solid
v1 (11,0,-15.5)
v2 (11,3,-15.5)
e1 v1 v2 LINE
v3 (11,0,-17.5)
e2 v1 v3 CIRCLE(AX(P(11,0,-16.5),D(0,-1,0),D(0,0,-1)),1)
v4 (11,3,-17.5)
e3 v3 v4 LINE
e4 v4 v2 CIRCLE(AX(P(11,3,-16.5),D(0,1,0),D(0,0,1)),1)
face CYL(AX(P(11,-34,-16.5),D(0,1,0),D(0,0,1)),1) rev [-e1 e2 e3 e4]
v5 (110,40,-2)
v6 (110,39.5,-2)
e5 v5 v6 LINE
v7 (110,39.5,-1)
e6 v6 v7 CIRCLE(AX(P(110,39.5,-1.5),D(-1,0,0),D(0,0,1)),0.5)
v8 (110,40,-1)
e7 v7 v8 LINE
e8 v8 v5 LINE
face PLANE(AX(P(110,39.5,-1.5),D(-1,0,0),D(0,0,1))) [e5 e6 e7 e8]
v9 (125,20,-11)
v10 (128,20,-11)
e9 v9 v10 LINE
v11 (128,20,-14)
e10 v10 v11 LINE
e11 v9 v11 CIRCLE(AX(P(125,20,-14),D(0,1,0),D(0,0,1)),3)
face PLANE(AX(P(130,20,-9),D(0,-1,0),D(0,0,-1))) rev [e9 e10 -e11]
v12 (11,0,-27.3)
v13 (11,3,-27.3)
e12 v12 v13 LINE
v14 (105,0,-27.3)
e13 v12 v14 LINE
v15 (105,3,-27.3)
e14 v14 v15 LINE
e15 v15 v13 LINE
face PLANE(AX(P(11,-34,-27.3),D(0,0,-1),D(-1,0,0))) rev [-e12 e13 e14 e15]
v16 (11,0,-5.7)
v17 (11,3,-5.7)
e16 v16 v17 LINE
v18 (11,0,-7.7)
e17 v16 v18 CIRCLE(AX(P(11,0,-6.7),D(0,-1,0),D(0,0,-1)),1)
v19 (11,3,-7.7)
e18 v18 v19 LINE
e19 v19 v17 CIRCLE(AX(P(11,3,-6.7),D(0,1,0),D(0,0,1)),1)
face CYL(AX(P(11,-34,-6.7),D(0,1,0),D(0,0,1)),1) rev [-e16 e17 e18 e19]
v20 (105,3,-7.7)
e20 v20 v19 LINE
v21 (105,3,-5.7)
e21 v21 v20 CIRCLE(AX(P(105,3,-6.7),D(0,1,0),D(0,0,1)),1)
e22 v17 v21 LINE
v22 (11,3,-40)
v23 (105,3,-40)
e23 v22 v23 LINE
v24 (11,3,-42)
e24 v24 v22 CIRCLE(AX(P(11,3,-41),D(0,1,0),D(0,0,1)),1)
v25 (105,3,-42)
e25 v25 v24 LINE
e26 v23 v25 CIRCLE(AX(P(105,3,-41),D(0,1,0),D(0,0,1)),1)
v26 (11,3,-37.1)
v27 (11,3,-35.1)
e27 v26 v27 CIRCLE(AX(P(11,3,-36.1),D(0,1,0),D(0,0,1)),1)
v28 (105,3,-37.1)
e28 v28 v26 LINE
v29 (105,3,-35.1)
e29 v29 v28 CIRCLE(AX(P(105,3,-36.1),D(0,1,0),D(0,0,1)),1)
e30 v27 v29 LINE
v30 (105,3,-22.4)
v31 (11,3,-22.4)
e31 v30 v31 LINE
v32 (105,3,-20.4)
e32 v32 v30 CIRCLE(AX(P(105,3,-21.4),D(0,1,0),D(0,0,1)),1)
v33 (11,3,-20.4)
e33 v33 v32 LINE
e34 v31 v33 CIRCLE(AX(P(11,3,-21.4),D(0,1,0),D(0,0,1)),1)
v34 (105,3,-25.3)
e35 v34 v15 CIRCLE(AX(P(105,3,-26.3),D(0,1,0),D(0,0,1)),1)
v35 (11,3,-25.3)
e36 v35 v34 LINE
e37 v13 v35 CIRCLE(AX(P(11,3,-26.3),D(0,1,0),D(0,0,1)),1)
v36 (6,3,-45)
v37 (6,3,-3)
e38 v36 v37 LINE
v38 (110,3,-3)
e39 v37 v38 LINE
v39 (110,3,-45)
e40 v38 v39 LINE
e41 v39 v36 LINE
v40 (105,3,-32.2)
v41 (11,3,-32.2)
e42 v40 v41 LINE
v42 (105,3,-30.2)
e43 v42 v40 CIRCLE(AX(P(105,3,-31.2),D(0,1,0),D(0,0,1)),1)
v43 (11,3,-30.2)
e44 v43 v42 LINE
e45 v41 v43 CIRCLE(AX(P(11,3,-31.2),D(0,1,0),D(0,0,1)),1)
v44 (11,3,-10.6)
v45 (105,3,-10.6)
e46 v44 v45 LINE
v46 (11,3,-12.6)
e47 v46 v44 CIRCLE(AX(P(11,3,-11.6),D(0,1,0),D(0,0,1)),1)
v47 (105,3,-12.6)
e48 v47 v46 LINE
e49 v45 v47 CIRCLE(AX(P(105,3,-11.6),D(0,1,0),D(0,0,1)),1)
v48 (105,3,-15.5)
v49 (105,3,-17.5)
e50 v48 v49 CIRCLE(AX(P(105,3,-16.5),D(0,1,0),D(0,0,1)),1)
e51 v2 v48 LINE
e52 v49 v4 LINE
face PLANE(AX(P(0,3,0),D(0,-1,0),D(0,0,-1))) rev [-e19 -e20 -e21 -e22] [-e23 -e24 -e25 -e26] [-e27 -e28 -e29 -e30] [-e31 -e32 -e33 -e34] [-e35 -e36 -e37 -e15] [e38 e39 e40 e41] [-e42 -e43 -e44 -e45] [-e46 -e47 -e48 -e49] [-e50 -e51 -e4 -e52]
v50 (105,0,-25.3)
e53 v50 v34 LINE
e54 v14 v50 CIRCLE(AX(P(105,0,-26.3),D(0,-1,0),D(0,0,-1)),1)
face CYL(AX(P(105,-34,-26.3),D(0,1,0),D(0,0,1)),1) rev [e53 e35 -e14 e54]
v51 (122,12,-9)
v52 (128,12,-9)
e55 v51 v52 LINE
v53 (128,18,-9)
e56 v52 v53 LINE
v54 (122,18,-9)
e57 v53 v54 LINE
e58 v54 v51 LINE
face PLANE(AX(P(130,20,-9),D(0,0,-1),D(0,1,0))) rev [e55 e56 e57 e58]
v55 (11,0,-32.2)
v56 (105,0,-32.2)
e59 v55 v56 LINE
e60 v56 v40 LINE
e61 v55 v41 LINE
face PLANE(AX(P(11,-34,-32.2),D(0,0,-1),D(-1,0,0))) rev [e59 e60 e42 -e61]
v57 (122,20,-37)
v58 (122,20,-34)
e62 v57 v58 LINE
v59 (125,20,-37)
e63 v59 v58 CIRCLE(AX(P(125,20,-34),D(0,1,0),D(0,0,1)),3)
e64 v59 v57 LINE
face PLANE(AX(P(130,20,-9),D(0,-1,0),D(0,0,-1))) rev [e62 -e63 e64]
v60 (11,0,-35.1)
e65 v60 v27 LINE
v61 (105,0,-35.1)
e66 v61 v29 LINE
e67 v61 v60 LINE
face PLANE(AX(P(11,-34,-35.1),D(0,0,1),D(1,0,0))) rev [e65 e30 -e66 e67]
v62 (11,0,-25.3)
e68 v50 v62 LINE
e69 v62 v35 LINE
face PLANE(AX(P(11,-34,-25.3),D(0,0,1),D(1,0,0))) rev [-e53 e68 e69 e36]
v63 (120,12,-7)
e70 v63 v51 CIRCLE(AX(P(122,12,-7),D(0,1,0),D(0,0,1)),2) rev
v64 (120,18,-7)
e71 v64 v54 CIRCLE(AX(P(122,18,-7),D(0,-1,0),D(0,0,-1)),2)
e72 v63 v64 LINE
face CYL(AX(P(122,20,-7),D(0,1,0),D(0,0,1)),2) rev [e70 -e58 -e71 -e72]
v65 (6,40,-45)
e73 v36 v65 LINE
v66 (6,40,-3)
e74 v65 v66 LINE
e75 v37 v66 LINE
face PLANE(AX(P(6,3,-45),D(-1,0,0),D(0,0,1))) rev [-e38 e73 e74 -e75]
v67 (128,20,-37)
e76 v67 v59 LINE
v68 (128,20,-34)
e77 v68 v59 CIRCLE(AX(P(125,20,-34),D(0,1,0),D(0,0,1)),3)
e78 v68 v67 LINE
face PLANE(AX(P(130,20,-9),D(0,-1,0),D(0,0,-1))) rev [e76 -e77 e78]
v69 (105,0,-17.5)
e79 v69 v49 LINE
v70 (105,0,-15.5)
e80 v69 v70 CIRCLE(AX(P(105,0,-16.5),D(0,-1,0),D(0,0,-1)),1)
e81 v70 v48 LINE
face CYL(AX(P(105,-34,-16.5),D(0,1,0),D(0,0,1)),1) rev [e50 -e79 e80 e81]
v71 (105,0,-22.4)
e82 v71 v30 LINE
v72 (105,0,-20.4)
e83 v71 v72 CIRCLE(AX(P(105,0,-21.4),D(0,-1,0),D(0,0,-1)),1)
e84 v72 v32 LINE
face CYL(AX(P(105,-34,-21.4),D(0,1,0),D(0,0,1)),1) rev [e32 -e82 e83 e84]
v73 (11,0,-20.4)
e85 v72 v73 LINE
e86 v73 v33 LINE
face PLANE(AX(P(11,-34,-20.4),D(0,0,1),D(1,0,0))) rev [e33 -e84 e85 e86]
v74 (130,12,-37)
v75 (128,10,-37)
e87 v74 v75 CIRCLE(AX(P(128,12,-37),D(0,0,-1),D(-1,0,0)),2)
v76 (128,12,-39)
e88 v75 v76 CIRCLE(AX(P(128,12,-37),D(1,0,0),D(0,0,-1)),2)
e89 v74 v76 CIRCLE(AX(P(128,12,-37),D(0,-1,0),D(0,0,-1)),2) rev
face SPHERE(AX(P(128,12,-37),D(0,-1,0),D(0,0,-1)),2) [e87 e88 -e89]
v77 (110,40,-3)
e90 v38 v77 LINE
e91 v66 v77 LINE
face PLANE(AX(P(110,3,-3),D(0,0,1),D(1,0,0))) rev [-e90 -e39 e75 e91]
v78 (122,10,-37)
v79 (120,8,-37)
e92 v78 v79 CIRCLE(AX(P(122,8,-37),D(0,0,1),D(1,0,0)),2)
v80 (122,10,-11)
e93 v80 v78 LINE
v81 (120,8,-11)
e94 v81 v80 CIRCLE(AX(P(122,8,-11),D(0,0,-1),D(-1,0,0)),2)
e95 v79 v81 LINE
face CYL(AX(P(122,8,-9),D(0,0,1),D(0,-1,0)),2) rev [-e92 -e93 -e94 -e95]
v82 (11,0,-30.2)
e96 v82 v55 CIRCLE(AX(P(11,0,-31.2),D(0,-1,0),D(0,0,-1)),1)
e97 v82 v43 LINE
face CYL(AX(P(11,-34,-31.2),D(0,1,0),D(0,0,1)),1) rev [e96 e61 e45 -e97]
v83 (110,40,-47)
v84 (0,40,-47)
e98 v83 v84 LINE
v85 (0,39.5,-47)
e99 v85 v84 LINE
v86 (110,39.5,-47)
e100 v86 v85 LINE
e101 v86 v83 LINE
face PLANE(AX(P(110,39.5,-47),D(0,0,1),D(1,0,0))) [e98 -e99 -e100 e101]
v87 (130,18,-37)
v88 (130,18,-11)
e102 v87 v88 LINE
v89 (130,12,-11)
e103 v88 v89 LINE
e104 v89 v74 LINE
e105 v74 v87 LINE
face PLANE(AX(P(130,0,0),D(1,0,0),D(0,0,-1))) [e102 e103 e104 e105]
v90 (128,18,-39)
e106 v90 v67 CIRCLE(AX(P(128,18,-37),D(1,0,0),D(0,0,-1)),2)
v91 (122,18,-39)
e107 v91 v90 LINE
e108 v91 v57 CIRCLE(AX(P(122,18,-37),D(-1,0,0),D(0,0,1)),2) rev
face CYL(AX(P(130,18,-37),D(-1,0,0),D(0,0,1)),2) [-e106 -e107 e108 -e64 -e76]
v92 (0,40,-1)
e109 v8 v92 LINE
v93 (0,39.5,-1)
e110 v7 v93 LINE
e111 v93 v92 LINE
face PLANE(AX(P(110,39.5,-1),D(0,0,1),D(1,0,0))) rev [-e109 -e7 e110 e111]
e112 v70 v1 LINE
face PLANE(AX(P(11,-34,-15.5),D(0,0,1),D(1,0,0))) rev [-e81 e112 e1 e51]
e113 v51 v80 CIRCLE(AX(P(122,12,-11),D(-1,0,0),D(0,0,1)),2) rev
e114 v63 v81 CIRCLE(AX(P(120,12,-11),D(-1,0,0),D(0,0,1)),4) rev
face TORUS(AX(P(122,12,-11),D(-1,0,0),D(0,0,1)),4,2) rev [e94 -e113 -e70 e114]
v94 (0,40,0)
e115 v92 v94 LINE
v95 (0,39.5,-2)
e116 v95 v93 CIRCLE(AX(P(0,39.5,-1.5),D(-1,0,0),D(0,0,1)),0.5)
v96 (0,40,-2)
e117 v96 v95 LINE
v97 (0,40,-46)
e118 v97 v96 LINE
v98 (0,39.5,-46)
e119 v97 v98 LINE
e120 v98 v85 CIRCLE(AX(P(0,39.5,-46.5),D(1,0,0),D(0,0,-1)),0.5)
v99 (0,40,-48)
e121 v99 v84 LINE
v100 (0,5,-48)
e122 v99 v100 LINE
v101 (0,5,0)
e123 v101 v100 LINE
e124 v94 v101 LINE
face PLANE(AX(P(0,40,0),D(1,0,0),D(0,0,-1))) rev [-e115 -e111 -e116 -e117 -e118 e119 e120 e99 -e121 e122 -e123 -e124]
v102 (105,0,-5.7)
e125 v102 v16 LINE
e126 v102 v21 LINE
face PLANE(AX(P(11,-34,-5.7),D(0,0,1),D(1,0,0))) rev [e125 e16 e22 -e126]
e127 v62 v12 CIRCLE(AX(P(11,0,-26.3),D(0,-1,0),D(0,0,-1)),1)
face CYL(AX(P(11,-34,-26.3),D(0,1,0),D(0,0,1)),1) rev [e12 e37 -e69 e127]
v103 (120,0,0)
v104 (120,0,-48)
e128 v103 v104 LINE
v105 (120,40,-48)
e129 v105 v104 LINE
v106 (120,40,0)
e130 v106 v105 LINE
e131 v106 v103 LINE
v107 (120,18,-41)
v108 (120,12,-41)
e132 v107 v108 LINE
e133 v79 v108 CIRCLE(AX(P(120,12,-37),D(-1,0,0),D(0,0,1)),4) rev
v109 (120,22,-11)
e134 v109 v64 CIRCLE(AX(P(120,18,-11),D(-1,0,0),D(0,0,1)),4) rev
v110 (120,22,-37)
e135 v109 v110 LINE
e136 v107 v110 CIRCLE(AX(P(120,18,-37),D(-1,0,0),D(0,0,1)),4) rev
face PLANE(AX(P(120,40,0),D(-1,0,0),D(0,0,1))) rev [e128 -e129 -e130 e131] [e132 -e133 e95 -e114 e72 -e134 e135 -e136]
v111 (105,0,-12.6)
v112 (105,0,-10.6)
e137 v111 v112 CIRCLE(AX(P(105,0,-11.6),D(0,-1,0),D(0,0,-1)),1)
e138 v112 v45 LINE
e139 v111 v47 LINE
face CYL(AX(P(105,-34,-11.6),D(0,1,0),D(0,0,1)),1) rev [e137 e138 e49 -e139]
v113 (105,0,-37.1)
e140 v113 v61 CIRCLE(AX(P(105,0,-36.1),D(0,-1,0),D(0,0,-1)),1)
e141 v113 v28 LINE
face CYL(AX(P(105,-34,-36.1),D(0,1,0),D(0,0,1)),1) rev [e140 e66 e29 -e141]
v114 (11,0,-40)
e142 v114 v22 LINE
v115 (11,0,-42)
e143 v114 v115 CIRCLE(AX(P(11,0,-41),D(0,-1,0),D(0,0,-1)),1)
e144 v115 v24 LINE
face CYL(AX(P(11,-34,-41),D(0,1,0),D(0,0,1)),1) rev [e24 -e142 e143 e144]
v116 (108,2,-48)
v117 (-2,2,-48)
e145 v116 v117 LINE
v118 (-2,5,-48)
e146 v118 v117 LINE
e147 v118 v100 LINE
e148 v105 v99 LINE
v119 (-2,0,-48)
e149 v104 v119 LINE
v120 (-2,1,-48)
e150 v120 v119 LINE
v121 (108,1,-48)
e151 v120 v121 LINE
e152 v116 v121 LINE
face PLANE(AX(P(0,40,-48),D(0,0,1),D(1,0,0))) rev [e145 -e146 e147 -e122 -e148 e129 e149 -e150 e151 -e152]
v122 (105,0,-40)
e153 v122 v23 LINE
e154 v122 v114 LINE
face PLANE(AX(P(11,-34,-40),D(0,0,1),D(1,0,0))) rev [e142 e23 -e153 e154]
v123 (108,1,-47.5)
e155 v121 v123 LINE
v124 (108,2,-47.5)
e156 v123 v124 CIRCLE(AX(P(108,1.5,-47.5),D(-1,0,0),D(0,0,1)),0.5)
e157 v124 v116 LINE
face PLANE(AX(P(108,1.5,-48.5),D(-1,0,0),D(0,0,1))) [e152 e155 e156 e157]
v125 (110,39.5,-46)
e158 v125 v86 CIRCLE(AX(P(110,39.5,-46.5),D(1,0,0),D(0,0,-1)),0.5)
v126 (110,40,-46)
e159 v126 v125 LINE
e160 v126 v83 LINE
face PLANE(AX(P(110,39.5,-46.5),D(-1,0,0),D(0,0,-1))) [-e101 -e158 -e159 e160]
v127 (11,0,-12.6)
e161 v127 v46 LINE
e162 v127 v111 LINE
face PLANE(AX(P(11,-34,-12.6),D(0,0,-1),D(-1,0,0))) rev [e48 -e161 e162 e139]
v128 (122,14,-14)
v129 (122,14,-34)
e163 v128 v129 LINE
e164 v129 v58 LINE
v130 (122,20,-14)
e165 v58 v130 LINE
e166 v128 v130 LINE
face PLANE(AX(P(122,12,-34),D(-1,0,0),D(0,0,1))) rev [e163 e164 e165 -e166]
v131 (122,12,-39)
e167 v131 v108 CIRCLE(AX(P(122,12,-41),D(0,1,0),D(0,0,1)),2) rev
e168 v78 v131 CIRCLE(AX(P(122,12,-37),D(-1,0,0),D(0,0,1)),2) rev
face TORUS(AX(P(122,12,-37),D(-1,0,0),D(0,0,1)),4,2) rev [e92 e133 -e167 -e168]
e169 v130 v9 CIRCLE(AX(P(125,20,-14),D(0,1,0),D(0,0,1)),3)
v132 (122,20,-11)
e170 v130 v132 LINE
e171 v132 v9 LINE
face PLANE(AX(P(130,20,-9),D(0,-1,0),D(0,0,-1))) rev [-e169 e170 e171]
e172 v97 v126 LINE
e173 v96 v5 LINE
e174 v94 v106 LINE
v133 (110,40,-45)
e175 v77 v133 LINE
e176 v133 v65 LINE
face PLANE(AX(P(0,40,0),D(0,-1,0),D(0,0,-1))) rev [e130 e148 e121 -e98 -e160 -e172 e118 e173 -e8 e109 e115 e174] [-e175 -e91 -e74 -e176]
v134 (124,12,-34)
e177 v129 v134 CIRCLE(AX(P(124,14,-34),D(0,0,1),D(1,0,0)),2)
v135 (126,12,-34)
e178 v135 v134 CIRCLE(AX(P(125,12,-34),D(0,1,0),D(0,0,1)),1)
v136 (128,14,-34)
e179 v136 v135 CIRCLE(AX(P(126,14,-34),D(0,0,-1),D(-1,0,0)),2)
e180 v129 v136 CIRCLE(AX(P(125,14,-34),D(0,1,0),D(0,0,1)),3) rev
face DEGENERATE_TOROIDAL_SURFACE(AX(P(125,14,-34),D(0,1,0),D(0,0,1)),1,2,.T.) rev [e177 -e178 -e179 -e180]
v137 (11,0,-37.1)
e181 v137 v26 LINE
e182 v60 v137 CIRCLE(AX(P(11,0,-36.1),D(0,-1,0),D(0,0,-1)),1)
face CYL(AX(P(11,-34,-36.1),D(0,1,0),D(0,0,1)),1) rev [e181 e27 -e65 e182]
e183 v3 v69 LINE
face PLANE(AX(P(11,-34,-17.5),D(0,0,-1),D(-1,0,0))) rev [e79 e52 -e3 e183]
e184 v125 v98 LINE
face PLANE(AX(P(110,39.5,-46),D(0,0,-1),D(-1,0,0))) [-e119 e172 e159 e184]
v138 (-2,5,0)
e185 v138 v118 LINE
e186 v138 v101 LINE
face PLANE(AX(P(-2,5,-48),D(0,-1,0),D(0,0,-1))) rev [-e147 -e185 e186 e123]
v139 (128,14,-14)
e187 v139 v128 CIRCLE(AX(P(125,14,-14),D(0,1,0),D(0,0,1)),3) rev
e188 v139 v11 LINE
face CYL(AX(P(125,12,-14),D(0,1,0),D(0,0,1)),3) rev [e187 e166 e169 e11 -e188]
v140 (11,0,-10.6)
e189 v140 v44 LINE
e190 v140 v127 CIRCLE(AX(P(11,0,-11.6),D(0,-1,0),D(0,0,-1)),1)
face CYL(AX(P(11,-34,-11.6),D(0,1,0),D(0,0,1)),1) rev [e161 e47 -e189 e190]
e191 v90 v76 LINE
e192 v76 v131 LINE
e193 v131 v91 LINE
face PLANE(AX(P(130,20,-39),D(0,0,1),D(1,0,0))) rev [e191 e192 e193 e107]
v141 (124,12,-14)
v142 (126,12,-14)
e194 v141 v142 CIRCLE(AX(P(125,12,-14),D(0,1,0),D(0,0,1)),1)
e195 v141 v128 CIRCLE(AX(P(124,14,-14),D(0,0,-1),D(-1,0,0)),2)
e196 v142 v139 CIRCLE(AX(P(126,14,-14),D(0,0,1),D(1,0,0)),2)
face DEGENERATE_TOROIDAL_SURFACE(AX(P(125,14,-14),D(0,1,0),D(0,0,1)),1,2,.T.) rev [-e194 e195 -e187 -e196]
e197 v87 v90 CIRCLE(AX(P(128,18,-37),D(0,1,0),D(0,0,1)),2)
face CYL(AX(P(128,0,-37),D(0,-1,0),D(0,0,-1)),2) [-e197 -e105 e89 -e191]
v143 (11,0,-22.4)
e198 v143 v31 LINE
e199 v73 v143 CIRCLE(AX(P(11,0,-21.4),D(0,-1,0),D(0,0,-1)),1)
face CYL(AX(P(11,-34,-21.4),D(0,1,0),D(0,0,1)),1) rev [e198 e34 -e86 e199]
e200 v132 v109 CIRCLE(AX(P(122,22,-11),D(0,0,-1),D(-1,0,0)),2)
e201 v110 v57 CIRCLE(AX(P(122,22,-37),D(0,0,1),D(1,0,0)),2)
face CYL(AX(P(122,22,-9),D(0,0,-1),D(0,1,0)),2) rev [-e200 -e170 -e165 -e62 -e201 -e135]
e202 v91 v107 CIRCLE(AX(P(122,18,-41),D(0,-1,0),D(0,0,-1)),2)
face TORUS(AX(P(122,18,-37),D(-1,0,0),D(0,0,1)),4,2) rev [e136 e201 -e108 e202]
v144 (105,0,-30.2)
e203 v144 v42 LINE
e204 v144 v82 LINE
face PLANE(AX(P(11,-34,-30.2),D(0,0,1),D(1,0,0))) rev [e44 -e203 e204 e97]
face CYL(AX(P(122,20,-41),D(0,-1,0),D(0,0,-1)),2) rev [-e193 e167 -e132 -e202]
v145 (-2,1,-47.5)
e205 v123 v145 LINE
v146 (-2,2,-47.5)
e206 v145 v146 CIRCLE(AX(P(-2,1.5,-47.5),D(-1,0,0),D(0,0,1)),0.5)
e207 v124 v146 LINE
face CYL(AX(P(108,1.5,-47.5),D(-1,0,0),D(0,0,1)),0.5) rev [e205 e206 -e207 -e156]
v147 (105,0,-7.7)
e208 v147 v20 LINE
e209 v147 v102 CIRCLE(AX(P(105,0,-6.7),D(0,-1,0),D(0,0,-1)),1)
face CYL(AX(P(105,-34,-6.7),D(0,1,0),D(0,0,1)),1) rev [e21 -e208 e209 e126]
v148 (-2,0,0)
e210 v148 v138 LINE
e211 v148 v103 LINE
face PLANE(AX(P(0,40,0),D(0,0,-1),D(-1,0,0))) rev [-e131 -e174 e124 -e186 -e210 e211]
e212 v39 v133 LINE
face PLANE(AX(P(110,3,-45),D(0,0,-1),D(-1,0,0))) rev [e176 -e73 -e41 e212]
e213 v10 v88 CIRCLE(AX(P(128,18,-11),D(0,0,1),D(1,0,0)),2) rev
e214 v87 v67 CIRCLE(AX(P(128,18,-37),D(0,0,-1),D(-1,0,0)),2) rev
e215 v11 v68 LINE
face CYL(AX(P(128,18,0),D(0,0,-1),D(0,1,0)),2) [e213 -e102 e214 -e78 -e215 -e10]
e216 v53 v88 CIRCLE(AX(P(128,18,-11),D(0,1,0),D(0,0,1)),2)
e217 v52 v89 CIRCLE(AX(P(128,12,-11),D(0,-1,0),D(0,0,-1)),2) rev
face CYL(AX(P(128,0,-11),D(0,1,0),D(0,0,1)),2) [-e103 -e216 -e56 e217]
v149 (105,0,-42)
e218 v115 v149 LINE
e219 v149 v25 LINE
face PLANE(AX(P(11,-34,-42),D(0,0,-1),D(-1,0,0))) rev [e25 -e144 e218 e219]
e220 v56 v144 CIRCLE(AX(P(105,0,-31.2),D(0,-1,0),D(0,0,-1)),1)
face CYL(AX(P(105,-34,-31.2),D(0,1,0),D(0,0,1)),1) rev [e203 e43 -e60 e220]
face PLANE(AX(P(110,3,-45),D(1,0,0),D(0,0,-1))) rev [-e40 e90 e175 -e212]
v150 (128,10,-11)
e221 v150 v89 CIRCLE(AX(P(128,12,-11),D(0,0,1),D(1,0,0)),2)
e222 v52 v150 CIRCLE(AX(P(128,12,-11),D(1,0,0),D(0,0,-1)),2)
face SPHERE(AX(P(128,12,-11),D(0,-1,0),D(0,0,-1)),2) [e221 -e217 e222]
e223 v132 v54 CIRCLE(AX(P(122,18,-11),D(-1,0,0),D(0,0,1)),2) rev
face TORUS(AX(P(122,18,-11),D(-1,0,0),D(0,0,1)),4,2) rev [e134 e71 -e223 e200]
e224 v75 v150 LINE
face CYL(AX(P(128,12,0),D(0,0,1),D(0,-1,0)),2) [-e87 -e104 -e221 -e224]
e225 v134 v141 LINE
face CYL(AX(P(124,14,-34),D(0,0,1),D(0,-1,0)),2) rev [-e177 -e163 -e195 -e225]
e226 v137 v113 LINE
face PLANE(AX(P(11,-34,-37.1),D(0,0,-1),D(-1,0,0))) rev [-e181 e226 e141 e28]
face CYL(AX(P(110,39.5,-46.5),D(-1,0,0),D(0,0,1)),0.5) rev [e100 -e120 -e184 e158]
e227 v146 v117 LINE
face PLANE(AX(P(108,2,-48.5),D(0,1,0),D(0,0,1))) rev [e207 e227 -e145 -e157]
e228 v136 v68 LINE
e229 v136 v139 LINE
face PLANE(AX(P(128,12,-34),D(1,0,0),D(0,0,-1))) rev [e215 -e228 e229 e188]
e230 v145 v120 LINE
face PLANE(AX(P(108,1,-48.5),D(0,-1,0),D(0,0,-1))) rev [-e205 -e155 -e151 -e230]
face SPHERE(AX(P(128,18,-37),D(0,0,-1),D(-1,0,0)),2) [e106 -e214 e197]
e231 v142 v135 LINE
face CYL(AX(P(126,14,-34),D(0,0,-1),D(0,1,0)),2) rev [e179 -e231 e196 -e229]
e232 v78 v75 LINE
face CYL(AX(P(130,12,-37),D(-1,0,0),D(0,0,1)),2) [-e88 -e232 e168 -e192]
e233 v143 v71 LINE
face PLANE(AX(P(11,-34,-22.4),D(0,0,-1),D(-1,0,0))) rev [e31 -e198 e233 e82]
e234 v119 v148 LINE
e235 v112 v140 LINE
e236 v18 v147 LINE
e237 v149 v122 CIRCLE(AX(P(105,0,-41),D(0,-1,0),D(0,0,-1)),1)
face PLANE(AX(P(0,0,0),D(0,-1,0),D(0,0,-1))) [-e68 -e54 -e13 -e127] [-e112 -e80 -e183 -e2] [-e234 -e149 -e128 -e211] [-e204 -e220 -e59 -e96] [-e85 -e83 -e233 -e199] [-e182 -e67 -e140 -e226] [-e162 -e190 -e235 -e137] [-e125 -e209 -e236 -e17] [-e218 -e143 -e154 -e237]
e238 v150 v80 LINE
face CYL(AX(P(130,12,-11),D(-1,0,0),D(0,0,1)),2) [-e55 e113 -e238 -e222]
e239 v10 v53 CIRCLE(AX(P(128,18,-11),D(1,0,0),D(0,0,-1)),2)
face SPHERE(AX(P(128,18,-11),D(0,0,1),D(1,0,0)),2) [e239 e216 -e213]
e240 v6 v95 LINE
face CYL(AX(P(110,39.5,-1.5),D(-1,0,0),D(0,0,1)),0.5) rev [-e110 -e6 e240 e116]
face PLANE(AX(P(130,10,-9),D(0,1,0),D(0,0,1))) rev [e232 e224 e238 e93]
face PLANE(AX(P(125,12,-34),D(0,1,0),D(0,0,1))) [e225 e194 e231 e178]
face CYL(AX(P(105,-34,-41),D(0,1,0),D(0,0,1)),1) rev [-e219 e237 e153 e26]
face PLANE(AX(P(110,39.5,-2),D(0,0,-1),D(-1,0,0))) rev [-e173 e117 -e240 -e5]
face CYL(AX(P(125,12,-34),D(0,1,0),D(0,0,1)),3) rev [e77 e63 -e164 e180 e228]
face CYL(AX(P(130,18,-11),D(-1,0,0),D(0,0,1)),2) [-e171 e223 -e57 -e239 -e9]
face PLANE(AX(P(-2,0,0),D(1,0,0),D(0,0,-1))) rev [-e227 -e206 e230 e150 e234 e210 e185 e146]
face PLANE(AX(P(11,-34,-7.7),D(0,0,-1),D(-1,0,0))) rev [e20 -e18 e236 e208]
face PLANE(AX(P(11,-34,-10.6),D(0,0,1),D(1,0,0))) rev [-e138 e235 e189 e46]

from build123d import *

# Parameters (mm, degrees)
SKETCH1_W           = 120
SKETCH1_H           = 48
BOSS_EXTRUDE1_DEPTH = 40
SKETCH3_W           = 104
SKETCH3_H           = 42
CUT_EXTRUDE1_DEPTH  = 37
CUT_EXTRUDE2_DEPTH  = 37
CUT_EXTRUDE4_DEPTH  = 110
SKETCH10_W          = 48
SKETCH10_H          = 5
BOSS_EXTRUDE3_DEPTH = 2
SKETCH11_W          = 30
SKETCH11_H          = 10
BOSS_EXTRUDE4_DEPTH = 10
CUT_EXTRUDE6_DEPTH  = 8
FILLET1_R           = 2
CUT_EXTRUDE5_DEPTH  = 110


with BuildPart() as part:
    # Sketch1 → Boss-Extrude1 (new body)
    with BuildSketch(Plane(origin=(0, 0, 0), x_dir=(1, 0, 0), z_dir=(0, 1, 0))):
        with Locations((60, 24)):
            Rectangle(SKETCH1_W, SKETCH1_H)
    extrude(amount=BOSS_EXTRUDE1_DEPTH)

    # Sketch3 → Cut-Extrude1 (cut)
    with BuildSketch(Plane(origin=(0, 40, 0), x_dir=(1, 0, 0), z_dir=(0, 1, 0))):
        with Locations((58, 24)):
            Rectangle(SKETCH3_W, SKETCH3_H)
    extrude(amount=-CUT_EXTRUDE1_DEPTH, mode=Mode.SUBTRACT)

    # Sketch5 → Cut-Extrude2 (cut)
    with BuildSketch(Plane(origin=(0, 3, 0), x_dir=(1, 0, 0), z_dir=(0, 1, 0))):
        with BuildLine():
            Line((11, 42), (105, 42))
            ThreePointArc((105, 42), (106, 41), (105, 40))
            Line((105, 40), (11, 40))
            ThreePointArc((11, 40), (10, 41), (11, 42))
        make_face()
        with BuildLine():
            Line((11, 35.1), (105, 35.1))
            ThreePointArc((105, 35.1), (106, 36.1), (105, 37.1))
            Line((105, 37.1), (11, 37.1))
            ThreePointArc((11, 37.1), (10, 36.1), (11, 35.1))
        make_face()
        with BuildLine():
            Line((11, 30.2), (105, 30.2))
            ThreePointArc((105, 30.2), (106, 31.2), (105, 32.2))
            Line((105, 32.2), (11, 32.2))
            ThreePointArc((11, 32.2), (10, 31.2), (11, 30.2))
        make_face()
        with BuildLine():
            Line((11, 25.3), (105, 25.3))
            ThreePointArc((105, 25.3), (106, 26.3), (105, 27.3))
            Line((105, 27.3), (11, 27.3))
            ThreePointArc((11, 27.3), (10, 26.3), (11, 25.3))
        make_face()
        with BuildLine():
            Line((11, 20.4), (105, 20.4))
            ThreePointArc((105, 20.4), (106, 21.4), (105, 22.4))
            Line((105, 22.4), (11, 22.4))
            ThreePointArc((11, 22.4), (10, 21.4), (11, 20.4))
        make_face()
        with BuildLine():
            Line((11, 15.5), (105, 15.5))
            ThreePointArc((105, 15.5), (106, 16.5), (105, 17.5))
            Line((105, 17.5), (11, 17.5))
            ThreePointArc((11, 17.5), (10, 16.5), (11, 15.5))
        make_face()
        with BuildLine():
            Line((11, 10.6), (105, 10.6))
            ThreePointArc((105, 10.6), (106, 11.6), (105, 12.6))
            Line((105, 12.6), (11, 12.6))
            ThreePointArc((11, 12.6), (10, 11.6), (11, 10.6))
        make_face()
        with BuildLine():
            Line((11, 5.7), (105, 5.7))
            ThreePointArc((105, 5.7), (106, 6.7), (105, 7.7))
            Line((105, 7.7), (11, 7.7))
            ThreePointArc((11, 7.7), (10, 6.7), (11, 5.7))
        make_face()
    extrude(amount=-CUT_EXTRUDE2_DEPTH, mode=Mode.SUBTRACT)

    # Sketch7 → Cut-Extrude4 (cut)
    with BuildSketch(Plane.ZY):
        with BuildLine():
            Line((-2, 39.5), (-2, 40.5))
            ThreePointArc((-2, 40.5), (-1.5, 41), (-1, 40.5))
            Line((-1, 40.5), (-1, 39.5))
            ThreePointArc((-1, 39.5), (-1.5, 39), (-2, 39.5))
        make_face()
    cut_extrude4 = extrude(amount=-CUT_EXTRUDE4_DEPTH, mode=Mode.SUBTRACT)

    # Mirror1: Cut-Extrude4 across plane
    add(cut_extrude4.mirror(Plane(origin=(0, 0, -24), x_dir=(1, 0, 0), z_dir=(0, 0, -1))), mode=Mode.SUBTRACT)

    # Sketch10 → Boss-Extrude3 (add)
    with BuildSketch(Plane.ZY):
        with Locations((-24, 2.5)):
            Rectangle(SKETCH10_W, SKETCH10_H)
    extrude(amount=BOSS_EXTRUDE3_DEPTH)

    # Sketch11 → Boss-Extrude4 (add)
    with BuildSketch(Plane(origin=(120, 0, 0), x_dir=(0, 0, -1), z_dir=(1, 0, 0))):
        with Locations((24, 15)):
            Rectangle(SKETCH11_W, SKETCH11_H)
    extrude(amount=BOSS_EXTRUDE4_DEPTH)

    # Sketch12 → Cut-Extrude6 (cut)
    with BuildSketch(Plane(origin=(0, 20, 0), x_dir=(1, 0, 0), z_dir=(0, 1, 0))):
        with BuildLine():
            Line((128, 34), (128, 14))
            ThreePointArc((128, 14), (125, 11), (122, 14))
            Line((122, 14), (122, 34))
            ThreePointArc((122, 34), (125, 37), (128, 34))
        make_face()
    extrude(amount=-CUT_EXTRUDE6_DEPTH, mode=Mode.SUBTRACT)

    # Fillet1
    fillet1_edges = [part.edges().sort_by_distance(p)[0] for p in [
        (120, 15, -9),
        (125, 20, -9),
        (120, 10, -24),
        (125, 10, -9),
        (120, 15, -39),
        (125, 10, -39),
        (120, 20, -24),
        (125, 20, -39),
        (130, 15, -9),
        (130, 10, -24),
        (130, 15, -39),
        (130, 20, -24),
        (125, 12, -37),
        (128, 12, -24),
        (125, 12, -11),
        (122, 12, -24),
    ]]
    fillet(fillet1_edges, radius=FILLET1_R - 0.0001)  # a hair under: the kernel refuses the full size

    # Sketch8 → Cut-Extrude5 (cut)
    with BuildSketch(Plane.ZY.offset(2)):
        with BuildLine():
            Line((-48.5, 2), (-47.5, 2))
            ThreePointArc((-47.5, 2), (-47, 1.5), (-47.5, 1))
            Line((-47.5, 1), (-48.5, 1))
            ThreePointArc((-48.5, 1), (-49, 1.5), (-48.5, 2))
        make_face()
    extrude(amount=-CUT_EXTRUDE5_DEPTH, mode=Mode.SUBTRACT)


solid = part.part
